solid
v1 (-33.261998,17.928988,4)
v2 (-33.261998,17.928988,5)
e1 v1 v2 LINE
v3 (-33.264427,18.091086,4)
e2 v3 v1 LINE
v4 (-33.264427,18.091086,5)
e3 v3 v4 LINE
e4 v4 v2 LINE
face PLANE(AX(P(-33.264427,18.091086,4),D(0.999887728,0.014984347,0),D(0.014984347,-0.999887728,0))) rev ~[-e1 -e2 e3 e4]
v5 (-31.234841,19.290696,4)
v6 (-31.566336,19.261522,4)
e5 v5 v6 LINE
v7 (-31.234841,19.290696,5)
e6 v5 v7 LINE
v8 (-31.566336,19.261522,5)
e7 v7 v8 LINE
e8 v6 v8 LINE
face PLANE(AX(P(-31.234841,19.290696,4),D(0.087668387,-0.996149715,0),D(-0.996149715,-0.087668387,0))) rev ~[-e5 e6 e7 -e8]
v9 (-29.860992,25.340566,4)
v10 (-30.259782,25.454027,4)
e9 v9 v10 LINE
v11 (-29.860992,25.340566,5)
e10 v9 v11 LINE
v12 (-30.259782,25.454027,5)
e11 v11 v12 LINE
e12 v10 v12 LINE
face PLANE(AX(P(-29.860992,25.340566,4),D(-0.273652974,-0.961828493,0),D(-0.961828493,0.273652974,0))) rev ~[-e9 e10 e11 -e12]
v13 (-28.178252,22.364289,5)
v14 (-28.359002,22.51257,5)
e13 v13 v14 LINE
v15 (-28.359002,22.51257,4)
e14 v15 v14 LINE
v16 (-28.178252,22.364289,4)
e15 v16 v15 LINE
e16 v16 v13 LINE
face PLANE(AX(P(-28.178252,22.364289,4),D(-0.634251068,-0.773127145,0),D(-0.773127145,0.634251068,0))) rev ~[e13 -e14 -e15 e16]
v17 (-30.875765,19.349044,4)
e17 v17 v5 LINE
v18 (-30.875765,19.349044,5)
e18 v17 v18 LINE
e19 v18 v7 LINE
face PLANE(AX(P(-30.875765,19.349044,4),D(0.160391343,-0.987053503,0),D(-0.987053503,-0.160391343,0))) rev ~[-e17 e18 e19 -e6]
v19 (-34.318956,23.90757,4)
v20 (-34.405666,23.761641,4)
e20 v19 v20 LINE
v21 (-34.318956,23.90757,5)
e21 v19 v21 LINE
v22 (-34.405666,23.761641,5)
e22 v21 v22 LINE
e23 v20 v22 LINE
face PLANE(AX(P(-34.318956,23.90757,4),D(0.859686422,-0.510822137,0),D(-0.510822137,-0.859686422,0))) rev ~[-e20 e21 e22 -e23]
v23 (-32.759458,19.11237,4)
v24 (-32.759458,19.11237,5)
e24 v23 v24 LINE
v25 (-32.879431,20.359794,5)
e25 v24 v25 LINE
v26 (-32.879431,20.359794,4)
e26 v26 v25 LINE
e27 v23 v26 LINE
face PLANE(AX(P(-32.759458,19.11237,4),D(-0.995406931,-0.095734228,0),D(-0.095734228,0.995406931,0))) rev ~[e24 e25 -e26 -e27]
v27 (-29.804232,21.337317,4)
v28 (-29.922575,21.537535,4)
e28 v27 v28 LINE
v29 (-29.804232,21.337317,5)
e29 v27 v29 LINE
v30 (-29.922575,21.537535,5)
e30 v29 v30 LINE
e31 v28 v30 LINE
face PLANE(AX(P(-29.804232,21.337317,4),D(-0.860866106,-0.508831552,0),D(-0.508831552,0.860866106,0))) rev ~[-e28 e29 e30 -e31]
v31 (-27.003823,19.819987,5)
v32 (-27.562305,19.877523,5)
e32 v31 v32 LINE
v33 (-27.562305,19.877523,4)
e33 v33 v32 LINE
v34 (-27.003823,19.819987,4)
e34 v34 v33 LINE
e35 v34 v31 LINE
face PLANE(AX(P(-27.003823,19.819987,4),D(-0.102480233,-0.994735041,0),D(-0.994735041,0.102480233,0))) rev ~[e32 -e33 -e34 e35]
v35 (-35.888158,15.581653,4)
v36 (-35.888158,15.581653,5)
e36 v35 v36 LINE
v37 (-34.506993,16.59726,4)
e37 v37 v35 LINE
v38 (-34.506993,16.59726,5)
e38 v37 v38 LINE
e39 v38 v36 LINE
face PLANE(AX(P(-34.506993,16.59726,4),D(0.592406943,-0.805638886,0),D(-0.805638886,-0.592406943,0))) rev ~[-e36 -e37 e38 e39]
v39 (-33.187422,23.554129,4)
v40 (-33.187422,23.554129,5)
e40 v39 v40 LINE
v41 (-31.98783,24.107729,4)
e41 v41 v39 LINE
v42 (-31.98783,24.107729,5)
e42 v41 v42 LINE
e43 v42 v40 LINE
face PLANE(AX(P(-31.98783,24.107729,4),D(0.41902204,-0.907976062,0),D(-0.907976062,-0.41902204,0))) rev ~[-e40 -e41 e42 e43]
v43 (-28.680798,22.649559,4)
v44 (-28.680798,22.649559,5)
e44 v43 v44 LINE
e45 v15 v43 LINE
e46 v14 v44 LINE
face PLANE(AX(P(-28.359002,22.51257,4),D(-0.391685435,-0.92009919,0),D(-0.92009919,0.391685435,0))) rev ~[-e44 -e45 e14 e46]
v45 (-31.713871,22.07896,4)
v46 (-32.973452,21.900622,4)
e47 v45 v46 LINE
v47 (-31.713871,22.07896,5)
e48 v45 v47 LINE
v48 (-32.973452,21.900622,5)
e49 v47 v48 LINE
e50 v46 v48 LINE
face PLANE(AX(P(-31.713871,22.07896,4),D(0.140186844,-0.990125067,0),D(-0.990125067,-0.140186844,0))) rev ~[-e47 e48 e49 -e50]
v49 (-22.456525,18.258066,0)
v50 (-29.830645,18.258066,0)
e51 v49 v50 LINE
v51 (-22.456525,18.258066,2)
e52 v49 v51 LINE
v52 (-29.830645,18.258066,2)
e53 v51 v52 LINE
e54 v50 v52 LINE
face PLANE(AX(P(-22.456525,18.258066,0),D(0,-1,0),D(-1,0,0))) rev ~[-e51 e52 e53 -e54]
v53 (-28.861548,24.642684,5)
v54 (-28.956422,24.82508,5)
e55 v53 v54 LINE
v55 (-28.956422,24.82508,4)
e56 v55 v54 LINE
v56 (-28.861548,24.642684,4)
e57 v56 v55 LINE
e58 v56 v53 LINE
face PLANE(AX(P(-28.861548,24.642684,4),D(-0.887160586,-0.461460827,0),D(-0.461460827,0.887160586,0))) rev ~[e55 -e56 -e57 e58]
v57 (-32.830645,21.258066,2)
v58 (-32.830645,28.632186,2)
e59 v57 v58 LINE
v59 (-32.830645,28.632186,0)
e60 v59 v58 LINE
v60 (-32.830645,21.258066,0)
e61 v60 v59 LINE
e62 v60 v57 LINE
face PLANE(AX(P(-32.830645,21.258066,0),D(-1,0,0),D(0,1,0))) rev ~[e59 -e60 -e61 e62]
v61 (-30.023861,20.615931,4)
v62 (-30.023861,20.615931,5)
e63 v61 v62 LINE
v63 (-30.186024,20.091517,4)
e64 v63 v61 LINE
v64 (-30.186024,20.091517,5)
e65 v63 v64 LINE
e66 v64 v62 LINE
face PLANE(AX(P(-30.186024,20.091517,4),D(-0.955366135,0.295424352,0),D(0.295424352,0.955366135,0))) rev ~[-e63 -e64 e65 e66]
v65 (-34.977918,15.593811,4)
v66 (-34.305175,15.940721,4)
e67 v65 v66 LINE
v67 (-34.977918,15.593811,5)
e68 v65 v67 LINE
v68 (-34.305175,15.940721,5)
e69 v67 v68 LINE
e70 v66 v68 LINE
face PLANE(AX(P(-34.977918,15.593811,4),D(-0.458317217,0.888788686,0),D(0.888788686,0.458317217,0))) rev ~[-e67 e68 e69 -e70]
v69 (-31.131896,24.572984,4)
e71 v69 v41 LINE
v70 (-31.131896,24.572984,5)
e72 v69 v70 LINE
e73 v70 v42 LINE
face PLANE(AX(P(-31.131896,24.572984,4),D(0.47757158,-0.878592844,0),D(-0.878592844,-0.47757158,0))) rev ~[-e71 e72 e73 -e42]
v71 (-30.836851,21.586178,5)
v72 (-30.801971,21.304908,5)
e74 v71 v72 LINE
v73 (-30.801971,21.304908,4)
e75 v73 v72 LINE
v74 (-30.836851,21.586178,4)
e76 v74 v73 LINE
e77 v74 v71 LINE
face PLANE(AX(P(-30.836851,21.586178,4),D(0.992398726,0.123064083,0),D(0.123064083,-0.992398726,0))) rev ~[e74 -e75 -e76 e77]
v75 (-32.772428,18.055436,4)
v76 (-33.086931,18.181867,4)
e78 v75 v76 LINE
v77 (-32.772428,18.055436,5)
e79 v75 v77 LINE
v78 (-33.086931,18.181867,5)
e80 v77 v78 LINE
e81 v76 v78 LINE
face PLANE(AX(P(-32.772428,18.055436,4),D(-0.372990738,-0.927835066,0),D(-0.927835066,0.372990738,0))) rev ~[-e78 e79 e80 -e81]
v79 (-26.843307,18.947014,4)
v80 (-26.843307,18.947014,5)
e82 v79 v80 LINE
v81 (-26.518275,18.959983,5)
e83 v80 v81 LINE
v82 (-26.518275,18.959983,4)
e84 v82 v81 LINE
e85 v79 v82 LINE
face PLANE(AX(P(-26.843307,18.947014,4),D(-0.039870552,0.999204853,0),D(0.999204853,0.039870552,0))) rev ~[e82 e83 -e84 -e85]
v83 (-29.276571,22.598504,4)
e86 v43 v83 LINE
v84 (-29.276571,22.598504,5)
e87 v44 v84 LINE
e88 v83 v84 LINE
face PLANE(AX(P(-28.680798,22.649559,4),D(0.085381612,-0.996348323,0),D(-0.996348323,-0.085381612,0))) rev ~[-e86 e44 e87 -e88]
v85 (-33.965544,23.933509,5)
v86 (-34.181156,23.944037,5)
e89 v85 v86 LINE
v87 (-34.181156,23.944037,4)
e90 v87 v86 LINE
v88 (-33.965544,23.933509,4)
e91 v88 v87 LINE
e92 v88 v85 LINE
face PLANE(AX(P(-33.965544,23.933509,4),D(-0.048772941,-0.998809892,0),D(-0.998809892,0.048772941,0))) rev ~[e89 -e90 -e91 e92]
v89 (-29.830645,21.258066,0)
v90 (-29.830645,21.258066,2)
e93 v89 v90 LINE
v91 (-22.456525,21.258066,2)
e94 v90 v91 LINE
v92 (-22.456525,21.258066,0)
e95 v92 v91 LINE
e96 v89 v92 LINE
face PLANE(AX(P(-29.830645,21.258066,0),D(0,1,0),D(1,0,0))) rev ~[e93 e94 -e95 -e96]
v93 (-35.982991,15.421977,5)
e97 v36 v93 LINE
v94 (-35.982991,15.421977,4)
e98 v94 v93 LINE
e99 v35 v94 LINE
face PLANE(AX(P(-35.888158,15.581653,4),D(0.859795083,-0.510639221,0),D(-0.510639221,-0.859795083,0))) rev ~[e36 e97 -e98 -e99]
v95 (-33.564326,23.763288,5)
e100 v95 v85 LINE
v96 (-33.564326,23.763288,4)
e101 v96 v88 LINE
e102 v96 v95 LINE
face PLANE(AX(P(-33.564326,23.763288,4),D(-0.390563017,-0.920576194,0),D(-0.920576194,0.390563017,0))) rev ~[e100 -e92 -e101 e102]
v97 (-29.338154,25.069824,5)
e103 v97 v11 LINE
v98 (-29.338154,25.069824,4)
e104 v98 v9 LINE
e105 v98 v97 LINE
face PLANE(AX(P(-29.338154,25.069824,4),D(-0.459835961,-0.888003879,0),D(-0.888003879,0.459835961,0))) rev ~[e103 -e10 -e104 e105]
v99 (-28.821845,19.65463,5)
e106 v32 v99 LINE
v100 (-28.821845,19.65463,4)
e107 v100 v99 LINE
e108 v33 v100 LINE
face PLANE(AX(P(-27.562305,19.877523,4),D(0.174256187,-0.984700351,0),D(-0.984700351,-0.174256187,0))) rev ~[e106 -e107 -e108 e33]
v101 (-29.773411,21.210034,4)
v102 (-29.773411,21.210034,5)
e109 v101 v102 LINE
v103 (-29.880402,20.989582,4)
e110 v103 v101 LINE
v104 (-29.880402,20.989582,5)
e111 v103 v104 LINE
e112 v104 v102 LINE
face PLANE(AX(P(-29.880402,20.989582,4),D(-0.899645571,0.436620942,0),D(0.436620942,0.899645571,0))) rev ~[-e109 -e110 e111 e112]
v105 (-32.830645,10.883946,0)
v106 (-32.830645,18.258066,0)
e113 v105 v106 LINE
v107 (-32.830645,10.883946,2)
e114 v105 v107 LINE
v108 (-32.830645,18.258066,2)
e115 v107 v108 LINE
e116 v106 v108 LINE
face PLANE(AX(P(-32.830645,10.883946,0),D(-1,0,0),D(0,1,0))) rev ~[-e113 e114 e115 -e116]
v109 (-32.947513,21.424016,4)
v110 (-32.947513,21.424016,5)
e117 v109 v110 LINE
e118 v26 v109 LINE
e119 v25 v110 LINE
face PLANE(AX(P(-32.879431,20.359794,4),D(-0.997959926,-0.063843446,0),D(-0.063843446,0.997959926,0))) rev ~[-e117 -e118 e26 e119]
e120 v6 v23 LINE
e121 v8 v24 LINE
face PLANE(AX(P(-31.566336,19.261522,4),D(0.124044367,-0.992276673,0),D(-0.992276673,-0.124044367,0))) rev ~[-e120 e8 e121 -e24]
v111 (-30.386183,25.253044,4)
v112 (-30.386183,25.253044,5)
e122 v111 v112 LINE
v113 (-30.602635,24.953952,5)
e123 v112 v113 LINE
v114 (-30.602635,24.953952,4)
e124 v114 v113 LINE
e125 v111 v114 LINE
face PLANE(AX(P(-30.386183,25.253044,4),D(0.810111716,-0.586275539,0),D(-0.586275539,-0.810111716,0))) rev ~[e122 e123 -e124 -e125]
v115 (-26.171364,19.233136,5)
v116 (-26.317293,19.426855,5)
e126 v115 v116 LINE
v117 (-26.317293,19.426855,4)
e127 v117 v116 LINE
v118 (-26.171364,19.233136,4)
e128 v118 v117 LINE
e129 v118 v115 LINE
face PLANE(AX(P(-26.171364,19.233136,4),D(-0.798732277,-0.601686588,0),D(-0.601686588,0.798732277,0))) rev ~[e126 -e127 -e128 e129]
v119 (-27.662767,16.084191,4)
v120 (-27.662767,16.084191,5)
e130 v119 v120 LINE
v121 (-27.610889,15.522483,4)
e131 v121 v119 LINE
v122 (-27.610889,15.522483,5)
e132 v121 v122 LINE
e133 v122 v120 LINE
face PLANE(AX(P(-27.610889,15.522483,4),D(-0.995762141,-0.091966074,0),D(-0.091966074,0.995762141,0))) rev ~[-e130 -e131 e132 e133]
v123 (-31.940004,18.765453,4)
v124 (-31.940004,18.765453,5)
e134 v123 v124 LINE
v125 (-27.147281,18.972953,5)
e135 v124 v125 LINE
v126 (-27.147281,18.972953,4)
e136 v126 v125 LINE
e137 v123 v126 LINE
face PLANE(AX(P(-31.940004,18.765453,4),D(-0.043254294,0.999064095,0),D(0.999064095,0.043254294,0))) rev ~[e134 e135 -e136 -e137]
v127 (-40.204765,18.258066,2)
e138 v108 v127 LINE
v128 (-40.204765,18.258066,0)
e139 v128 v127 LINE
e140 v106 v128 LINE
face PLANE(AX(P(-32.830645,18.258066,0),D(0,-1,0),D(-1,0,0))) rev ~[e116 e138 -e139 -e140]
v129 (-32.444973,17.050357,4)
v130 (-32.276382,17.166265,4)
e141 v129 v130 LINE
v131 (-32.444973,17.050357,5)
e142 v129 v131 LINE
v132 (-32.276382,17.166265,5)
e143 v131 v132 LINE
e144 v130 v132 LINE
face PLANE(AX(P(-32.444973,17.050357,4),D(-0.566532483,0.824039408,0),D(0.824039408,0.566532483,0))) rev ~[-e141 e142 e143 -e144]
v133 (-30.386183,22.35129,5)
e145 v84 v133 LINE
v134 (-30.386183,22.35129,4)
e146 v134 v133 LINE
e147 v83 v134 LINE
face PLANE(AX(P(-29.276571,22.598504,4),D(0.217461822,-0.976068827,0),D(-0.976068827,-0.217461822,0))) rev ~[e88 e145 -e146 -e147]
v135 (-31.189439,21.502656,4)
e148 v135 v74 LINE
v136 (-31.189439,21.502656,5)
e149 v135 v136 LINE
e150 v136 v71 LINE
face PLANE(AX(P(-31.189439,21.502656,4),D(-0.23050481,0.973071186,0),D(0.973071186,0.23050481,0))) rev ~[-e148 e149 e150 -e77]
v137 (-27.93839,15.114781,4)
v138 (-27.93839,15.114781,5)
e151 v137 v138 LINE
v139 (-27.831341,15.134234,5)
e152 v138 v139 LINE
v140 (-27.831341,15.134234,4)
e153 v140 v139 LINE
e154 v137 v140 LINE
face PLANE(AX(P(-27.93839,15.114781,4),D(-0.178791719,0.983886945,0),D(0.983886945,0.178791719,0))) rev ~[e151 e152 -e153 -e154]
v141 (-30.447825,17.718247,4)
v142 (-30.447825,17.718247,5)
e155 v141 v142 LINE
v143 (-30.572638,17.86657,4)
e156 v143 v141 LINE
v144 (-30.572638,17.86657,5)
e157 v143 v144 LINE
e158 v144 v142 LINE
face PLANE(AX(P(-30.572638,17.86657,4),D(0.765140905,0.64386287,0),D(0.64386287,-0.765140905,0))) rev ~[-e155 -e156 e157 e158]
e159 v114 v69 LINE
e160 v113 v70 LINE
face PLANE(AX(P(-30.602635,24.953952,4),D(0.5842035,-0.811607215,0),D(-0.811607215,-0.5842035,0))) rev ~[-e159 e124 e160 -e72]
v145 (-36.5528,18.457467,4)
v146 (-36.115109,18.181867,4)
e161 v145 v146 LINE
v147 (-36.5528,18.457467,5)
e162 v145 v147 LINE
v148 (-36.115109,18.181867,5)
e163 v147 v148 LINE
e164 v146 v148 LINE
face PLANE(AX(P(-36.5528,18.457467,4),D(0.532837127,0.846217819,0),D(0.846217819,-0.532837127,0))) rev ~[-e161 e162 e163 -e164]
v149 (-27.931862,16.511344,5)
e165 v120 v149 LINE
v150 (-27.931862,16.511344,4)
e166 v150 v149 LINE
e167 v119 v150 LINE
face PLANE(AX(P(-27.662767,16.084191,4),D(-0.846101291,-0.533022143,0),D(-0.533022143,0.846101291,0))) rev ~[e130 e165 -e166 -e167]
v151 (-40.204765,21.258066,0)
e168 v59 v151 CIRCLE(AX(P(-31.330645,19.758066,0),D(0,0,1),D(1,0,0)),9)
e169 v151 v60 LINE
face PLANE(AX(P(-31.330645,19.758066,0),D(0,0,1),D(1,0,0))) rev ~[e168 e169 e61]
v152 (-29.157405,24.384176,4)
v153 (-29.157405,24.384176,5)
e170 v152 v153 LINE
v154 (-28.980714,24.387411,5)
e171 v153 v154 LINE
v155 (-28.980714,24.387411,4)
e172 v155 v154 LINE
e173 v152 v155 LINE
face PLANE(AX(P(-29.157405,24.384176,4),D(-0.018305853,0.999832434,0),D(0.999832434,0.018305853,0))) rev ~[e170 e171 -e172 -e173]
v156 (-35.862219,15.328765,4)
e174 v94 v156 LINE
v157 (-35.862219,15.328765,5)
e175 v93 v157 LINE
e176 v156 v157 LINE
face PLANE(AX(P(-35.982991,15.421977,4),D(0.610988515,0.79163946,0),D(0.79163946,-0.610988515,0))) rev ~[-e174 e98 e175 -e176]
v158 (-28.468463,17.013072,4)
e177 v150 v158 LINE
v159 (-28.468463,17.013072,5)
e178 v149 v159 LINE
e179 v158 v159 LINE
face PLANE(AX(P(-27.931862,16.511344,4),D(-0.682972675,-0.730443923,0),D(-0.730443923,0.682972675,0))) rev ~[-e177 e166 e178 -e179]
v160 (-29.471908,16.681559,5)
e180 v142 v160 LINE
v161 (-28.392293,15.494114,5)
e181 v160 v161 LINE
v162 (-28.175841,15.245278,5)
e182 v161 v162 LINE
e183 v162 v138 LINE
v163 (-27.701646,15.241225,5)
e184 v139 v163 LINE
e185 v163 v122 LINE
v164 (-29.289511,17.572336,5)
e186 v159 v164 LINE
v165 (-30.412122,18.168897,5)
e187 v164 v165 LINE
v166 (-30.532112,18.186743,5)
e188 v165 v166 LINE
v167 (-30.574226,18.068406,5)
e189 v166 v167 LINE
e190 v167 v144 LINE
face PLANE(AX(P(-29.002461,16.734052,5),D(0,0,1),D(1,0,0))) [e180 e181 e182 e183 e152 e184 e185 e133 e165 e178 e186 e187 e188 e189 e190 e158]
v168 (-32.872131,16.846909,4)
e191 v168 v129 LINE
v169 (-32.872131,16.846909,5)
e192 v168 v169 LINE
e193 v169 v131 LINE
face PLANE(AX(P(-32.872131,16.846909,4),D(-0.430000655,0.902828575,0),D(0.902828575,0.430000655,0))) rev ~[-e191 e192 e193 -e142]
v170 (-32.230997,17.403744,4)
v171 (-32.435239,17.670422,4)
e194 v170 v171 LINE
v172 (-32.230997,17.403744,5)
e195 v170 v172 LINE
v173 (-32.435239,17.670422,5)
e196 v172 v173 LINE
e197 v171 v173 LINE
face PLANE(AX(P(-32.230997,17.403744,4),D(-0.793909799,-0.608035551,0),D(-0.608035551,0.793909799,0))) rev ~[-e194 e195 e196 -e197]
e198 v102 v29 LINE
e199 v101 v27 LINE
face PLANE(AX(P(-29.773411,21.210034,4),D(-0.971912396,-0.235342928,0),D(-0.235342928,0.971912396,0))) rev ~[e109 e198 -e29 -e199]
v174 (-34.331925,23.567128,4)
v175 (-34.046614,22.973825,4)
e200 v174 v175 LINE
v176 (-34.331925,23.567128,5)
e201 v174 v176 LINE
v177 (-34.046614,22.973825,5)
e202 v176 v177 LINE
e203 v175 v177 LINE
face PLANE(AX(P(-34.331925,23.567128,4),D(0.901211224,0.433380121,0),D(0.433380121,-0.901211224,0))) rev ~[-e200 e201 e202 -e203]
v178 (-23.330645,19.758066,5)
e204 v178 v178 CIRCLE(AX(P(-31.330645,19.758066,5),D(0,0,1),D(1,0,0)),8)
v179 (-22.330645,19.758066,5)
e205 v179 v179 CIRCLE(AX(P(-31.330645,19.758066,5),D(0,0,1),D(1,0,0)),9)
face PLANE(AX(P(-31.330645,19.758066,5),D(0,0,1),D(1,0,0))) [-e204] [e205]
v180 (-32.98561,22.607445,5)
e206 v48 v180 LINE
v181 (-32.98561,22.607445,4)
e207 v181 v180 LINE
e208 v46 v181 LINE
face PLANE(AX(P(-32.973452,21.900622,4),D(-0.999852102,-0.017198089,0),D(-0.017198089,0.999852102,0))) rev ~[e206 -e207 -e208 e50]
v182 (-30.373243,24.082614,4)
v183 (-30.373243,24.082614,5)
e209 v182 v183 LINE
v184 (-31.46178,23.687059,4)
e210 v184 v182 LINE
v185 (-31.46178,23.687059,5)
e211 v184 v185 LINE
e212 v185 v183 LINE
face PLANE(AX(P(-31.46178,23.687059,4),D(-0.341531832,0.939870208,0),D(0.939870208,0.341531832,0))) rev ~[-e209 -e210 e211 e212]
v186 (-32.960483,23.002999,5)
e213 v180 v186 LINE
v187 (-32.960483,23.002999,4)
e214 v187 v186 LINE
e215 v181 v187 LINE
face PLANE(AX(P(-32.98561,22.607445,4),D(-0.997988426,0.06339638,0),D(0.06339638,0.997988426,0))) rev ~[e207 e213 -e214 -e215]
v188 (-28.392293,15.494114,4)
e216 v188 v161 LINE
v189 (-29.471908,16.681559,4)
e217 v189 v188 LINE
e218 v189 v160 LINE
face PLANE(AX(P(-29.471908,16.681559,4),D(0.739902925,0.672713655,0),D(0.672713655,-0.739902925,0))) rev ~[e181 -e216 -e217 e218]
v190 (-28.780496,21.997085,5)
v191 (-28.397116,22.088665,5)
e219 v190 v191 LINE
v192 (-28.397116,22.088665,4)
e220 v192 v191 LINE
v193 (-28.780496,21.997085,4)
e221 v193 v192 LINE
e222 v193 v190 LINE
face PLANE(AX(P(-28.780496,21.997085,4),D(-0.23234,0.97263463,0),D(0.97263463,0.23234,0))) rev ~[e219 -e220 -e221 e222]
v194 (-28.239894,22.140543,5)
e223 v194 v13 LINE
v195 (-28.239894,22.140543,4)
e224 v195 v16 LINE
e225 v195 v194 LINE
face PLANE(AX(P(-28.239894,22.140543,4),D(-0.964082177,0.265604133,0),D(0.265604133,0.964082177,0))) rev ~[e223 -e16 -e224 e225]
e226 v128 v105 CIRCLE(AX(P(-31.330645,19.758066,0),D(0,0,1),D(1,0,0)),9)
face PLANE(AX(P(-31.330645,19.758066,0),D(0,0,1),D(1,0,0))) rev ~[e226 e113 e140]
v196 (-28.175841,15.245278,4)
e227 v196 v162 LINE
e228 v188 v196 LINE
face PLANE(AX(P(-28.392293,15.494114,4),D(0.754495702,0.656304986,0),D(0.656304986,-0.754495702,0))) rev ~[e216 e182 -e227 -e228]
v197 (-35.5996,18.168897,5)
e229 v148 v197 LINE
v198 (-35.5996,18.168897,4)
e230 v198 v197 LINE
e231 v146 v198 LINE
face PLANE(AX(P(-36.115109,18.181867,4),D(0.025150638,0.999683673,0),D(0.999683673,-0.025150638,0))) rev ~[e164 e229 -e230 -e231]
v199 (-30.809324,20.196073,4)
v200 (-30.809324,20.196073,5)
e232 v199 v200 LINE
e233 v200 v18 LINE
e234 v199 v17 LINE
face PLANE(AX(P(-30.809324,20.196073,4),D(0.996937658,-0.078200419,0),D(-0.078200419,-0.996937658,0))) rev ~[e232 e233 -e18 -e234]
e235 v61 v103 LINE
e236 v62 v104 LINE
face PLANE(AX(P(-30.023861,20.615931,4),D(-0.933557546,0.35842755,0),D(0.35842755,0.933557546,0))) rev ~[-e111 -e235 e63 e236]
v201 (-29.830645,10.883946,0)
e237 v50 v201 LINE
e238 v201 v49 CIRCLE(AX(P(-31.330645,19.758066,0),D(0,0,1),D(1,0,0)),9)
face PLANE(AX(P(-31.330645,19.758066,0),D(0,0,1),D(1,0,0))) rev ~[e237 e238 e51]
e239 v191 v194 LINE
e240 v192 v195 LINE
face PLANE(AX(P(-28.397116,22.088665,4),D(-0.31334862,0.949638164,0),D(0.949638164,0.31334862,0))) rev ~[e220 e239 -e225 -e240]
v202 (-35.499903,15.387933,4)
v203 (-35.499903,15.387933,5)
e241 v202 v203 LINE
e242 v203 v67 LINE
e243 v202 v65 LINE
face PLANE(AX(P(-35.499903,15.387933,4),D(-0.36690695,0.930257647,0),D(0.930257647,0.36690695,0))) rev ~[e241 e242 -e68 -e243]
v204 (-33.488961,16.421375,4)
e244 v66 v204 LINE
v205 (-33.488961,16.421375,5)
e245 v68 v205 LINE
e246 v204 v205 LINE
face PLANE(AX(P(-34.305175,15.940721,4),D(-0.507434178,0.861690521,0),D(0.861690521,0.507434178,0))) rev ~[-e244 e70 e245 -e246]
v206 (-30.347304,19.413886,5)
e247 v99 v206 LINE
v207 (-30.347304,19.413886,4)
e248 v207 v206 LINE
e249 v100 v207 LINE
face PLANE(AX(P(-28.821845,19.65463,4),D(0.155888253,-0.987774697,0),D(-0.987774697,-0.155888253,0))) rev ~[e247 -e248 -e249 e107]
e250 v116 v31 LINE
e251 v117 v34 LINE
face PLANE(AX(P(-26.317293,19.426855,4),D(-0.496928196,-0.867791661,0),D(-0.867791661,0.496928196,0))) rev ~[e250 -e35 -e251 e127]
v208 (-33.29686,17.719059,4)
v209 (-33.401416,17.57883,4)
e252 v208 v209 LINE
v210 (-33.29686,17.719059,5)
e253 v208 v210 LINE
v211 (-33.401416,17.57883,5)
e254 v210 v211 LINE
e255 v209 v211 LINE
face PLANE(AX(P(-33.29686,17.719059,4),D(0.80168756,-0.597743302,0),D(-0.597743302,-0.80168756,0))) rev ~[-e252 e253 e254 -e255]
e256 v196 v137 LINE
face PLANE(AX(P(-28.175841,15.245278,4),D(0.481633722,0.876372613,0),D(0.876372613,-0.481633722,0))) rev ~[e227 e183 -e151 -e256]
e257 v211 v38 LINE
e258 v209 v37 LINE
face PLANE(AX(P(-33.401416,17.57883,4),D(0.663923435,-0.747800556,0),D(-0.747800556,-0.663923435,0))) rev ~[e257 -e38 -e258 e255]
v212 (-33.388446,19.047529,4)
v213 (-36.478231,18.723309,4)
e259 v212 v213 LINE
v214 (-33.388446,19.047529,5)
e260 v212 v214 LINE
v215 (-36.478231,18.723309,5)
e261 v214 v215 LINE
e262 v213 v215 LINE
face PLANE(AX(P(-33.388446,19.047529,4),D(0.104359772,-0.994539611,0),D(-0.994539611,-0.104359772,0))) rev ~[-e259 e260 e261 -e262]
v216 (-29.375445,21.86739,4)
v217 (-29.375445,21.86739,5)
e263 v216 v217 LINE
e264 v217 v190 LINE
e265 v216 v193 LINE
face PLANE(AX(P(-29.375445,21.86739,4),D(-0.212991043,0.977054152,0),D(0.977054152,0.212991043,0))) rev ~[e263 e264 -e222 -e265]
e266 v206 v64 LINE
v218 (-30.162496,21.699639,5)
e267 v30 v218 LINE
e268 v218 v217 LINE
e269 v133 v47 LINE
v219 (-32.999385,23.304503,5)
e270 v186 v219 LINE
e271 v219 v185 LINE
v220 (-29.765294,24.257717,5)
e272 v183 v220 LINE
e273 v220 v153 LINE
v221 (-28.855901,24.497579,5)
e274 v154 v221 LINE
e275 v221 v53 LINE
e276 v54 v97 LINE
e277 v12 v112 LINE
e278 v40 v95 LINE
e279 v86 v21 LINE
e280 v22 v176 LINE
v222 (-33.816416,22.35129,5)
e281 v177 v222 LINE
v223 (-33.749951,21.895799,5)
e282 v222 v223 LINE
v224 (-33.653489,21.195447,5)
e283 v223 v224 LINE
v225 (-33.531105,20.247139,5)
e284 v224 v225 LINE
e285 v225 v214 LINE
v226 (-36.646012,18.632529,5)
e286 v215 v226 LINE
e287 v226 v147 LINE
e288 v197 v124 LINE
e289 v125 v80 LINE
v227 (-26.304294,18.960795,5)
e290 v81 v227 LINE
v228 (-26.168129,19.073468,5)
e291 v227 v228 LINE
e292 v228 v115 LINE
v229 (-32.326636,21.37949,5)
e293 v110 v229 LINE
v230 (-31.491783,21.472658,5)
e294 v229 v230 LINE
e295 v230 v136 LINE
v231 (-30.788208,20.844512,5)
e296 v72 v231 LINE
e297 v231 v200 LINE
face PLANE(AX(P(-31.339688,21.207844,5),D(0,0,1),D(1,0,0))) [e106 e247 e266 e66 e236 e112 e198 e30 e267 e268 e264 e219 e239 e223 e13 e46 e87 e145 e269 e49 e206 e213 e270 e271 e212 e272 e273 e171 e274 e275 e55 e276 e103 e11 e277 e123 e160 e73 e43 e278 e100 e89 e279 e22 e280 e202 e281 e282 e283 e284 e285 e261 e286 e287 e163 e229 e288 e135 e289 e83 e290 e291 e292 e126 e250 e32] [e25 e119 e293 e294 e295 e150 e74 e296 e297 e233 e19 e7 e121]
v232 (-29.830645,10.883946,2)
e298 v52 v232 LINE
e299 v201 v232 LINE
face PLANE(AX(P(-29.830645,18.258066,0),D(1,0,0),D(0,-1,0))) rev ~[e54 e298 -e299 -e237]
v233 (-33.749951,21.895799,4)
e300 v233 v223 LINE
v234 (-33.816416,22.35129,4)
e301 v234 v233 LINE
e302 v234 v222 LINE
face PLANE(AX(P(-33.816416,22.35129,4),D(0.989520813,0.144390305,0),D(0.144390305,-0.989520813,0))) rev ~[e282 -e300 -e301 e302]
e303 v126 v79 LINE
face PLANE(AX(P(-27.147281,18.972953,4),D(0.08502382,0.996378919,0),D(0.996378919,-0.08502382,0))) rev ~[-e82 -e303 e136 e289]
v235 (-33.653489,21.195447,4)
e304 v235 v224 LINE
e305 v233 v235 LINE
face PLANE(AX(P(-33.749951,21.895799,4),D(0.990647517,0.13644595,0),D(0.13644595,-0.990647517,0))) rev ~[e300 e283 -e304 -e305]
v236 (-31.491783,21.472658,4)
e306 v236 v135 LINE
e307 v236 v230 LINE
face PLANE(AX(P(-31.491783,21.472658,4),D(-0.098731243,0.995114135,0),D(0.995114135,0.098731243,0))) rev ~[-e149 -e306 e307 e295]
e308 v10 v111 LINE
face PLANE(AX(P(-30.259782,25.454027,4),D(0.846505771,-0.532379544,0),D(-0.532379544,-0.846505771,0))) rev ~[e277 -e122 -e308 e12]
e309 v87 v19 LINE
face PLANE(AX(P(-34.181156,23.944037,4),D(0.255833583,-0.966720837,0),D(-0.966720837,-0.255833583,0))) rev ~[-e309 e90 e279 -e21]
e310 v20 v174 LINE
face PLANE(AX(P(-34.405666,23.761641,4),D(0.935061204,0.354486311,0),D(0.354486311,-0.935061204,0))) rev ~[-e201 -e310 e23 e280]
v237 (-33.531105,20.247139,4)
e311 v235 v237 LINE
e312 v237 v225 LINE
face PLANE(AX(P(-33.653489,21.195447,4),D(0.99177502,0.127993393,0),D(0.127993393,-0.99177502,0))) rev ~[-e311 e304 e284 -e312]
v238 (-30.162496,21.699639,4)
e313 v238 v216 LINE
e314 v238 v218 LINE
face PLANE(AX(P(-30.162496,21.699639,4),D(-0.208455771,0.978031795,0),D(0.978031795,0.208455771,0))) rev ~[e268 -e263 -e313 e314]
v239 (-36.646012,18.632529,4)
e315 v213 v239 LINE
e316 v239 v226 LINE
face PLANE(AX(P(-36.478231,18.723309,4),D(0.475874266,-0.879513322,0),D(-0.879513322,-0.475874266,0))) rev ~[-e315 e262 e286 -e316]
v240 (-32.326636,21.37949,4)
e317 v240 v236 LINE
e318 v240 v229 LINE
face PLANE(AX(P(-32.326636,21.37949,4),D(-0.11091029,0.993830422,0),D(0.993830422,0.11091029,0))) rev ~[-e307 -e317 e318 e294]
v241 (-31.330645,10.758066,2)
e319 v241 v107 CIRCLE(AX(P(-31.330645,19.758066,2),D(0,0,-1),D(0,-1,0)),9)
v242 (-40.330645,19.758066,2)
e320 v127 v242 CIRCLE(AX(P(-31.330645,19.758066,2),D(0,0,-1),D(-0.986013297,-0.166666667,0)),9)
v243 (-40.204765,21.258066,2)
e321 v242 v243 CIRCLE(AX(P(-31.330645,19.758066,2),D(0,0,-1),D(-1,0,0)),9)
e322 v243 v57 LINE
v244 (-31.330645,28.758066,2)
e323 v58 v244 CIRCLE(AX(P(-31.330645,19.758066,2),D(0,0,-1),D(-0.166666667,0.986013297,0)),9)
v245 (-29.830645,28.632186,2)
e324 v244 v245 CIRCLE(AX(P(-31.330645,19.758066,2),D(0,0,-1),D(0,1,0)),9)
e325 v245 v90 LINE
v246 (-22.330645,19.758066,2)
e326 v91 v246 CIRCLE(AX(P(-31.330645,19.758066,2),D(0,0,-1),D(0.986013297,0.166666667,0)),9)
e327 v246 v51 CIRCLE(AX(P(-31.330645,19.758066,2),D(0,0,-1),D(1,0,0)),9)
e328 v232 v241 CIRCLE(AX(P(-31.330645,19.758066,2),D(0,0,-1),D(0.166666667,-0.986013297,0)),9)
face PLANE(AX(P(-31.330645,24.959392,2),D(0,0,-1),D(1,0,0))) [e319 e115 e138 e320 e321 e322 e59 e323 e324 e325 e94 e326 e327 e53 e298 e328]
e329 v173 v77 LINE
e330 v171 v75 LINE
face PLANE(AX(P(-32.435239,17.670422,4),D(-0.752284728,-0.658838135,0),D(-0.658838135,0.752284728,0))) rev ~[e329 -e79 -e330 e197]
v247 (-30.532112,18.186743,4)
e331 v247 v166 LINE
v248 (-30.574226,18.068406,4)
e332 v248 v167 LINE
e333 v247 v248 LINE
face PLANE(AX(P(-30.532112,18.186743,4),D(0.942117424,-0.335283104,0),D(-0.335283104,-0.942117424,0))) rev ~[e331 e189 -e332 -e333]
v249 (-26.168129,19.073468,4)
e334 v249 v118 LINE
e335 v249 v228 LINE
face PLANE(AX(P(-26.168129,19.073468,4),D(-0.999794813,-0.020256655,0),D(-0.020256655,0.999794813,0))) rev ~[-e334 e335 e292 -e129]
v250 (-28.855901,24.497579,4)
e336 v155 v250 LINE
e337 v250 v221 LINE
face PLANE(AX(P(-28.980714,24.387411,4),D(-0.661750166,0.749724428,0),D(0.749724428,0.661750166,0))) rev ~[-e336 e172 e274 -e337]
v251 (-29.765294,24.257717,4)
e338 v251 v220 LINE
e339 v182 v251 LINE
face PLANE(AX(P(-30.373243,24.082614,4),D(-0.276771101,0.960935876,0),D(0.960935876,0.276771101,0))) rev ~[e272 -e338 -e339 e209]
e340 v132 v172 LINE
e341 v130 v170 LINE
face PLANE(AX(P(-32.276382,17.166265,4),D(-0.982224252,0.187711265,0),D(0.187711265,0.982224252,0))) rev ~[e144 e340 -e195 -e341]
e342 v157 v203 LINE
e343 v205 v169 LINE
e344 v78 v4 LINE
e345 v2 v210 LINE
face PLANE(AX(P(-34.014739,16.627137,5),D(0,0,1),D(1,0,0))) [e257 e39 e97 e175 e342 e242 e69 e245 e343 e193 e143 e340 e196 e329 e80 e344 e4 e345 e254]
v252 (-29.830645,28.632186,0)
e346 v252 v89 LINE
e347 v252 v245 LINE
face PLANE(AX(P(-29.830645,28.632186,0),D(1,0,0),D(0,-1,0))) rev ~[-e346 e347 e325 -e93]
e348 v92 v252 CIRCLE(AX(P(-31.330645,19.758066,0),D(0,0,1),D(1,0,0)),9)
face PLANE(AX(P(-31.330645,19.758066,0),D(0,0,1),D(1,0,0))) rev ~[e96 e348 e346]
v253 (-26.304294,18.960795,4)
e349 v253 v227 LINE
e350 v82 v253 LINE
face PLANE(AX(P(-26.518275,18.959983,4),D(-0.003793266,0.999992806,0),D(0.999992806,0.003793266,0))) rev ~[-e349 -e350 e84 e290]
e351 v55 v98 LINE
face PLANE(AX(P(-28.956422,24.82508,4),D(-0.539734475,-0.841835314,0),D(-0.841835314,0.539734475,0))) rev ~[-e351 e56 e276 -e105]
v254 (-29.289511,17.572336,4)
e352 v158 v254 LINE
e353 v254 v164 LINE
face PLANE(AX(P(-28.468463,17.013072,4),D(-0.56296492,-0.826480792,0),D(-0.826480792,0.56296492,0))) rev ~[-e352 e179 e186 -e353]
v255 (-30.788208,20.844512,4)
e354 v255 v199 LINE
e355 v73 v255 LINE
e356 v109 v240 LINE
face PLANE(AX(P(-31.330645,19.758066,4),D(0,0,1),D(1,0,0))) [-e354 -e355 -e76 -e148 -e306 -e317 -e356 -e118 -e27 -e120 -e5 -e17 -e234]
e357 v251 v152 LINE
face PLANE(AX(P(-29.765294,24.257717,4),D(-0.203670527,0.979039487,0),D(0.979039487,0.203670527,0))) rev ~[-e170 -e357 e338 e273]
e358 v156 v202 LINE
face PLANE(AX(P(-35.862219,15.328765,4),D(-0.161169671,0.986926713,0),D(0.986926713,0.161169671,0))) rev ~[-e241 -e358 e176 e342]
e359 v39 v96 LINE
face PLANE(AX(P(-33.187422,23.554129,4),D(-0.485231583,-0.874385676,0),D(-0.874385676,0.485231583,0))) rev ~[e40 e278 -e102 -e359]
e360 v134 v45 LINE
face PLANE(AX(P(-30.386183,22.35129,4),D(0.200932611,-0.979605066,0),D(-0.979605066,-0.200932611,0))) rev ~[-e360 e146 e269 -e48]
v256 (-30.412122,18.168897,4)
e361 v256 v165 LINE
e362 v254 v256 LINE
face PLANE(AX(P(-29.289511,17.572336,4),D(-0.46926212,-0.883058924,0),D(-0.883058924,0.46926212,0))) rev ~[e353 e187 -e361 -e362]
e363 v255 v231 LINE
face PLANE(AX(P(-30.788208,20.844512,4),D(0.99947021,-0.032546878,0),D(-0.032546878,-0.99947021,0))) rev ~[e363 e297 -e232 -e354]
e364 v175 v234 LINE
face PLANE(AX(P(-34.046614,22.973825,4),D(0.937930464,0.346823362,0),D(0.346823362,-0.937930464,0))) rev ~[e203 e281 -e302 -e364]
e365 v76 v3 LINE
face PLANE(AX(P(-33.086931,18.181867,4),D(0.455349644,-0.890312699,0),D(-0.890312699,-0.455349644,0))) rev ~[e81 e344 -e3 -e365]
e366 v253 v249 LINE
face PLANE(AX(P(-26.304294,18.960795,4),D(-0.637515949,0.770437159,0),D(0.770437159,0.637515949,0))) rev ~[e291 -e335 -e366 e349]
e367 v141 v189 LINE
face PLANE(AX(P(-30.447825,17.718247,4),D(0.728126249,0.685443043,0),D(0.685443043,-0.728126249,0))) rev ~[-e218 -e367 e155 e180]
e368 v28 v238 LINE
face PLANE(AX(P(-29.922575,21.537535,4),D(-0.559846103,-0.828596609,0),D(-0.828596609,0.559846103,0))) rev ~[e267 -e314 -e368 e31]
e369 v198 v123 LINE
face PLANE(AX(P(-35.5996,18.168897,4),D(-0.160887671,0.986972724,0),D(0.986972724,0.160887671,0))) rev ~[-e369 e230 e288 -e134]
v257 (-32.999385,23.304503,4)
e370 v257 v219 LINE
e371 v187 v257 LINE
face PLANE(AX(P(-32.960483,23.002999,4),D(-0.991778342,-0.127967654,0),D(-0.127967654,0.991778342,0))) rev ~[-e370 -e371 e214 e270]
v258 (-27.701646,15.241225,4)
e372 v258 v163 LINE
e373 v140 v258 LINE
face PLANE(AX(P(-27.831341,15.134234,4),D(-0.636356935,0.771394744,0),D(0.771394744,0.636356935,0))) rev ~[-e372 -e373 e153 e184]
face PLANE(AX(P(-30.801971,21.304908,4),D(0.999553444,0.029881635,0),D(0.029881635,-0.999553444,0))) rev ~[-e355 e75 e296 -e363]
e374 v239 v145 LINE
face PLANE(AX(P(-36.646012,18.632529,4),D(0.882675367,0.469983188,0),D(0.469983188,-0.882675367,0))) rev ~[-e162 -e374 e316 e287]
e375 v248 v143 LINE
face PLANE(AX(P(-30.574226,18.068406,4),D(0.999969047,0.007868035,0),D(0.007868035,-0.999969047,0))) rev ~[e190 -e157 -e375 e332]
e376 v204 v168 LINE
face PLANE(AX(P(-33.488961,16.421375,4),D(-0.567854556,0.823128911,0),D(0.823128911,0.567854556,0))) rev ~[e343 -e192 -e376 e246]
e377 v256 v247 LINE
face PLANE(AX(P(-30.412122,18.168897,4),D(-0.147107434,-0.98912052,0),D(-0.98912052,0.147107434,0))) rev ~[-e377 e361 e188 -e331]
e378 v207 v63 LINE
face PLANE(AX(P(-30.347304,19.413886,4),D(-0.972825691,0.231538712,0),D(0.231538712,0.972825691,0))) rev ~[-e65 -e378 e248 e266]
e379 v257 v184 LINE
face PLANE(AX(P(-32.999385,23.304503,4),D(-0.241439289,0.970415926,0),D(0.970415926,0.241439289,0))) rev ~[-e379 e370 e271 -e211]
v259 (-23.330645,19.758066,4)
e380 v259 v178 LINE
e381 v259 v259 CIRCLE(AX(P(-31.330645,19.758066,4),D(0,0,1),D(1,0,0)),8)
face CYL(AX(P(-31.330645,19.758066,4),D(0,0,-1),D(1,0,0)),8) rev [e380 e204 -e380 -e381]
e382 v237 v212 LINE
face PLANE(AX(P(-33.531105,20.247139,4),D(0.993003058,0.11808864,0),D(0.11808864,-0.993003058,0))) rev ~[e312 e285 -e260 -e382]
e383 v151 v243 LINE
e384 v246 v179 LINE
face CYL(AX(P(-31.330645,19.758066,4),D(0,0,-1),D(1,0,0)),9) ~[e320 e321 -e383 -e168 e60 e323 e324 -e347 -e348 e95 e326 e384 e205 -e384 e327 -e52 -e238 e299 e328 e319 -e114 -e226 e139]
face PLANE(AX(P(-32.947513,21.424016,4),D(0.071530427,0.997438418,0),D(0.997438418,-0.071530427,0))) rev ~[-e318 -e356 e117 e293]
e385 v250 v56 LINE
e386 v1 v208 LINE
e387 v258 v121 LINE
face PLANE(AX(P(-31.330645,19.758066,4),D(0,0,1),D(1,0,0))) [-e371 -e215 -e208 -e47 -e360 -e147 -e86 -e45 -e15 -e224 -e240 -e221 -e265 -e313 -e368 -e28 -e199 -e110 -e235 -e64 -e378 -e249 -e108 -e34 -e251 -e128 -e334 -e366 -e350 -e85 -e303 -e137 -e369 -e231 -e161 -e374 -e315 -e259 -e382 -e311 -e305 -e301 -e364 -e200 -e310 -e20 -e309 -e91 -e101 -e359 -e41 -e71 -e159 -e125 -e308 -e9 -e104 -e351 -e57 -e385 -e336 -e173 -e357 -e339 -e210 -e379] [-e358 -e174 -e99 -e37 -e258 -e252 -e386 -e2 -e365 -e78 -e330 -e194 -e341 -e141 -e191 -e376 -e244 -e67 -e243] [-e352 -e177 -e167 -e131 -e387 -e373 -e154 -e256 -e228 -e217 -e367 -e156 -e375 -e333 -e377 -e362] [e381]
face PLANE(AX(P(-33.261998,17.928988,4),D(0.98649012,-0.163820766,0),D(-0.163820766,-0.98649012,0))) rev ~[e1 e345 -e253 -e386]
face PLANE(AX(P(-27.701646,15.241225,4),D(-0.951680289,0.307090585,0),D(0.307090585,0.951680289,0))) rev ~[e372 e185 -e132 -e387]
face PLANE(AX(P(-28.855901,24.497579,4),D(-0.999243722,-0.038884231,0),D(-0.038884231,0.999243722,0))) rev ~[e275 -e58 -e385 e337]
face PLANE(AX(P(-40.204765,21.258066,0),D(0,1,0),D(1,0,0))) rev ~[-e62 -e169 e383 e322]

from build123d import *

# Parameters (mm, degrees)
F0_R     = 9
F1_DEPTH = 4
F3_W     = 3
F3_H     = 3
F4_DEPTH = 2
F2_R     = 9
F2_R_2   = 8
F5_DEPTH = 1
F7_DEPTH = 1


# Not quite as in the source:
# - a feature names something its author has since deleted; it is built from what else it names


with BuildPart() as f1:
    # F0 (on Top) → F1 (new body)
    with BuildSketch(Plane.XY):
        with Locations((-31.3306450844, 19.7580661625)):
            Circle(F0_R)
    extrude(amount=F1_DEPTH)

    # F3 (on face) → F4 (cut)
    with BuildSketch(Plane(origin=(0, 0, 0), x_dir=(1, 0, 0), z_dir=(0, 0, -1))):
        with BuildLine():
            ThreePointArc((-32.8306450844, -28.6321858371), (-32.0832814269, -28.7265408676), (-31.3306450844, -28.7580661625))
            ThreePointArc((-31.3306450844, -28.7580661625), (-30.5780087419, -28.7265408676), (-29.8306450844, -28.6321858371))
            Line((-29.8306450844, -28.6321858371), (-29.8306450844, -21.2580661625))
            Line((-29.8306450844, -21.2580661625), (-32.8306450844, -21.2580661625))
            Line((-32.8306450844, -21.2580661625), (-32.8306450844, -28.6321858371))
        make_face()
        with BuildLine():
            ThreePointArc((-40.204764759, -18.2580661625), (-40.2991197895, -19.0054298199), (-40.3306450844, -19.7580661625))
            ThreePointArc((-40.3306450844, -19.7580661625), (-40.2991197895, -20.510702505), (-40.204764759, -21.2580661625))
            Line((-40.204764759, -21.2580661625), (-32.8306450844, -21.2580661625))
            Line((-32.8306450844, -21.2580661625), (-32.8306450844, -18.2580661625))
            Line((-32.8306450844, -18.2580661625), (-40.204764759, -18.2580661625))
        make_face()
        with Locations((-31.3306450844, -19.7580661625)):
            Rectangle(F3_W, F3_H)
        with BuildLine():
            Line((-29.8306450844, -18.2580661625), (-29.8306450844, -21.2580661625))
            Line((-29.8306450844, -21.2580661625), (-22.4565254097, -21.2580661625))
            ThreePointArc((-22.4565254097, -21.2580661625), (-22.3621703793, -20.510702505), (-22.3306450844, -19.7580661625))
            ThreePointArc((-22.3306450844, -19.7580661625), (-22.3621703793, -19.0054298199), (-22.4565254097, -18.2580661625))
            Line((-22.4565254097, -18.2580661625), (-29.8306450844, -18.2580661625))
        make_face()
        with BuildLine():
            Line((-32.8306450844, -10.8839464878), (-32.8306450844, -18.2580661625))
            Line((-32.8306450844, -18.2580661625), (-29.8306450844, -18.2580661625))
            Line((-29.8306450844, -18.2580661625), (-29.8306450844, -10.8839464878))
            ThreePointArc((-29.8306450844, -10.8839464878), (-30.5780087419, -10.7895914574), (-31.3306450844, -10.7580661625))
            ThreePointArc((-31.3306450844, -10.7580661625), (-32.0832814269, -10.7895914574), (-32.8306450844, -10.8839464878))
        make_face()
    extrude(amount=-F4_DEPTH, mode=Mode.SUBTRACT)

    # F2 (on face) → F5 (join)
    with BuildSketch(Plane.XY.offset(4)):
        with Locations((-31.3306450844, 19.7580661625)):
            Circle(F2_R)
        with Locations((-31.3306450844, 19.7580661625)):
            Circle(F2_R_2, mode=Mode.SUBTRACT)
    extrude(amount=F5_DEPTH)

    # F6 (on face) → F7 (join)
    with BuildSketch(Plane.XY.offset(4)):
        Polygon((-33.5311048114, 20.2471387647), (-33.3884463109, 19.0475286451), (-36.4782309787, 18.7233090579), (-36.6460120564, 18.6325285146), (-36.5527999544, 18.4574668773), (-36.1151093936, 18.1818667), (-35.5996001325, 18.1688972107), (-31.940004334, 18.7654525459), (-27.1472810179, 18.9729526111), (-26.8433067742, 18.9470136325), (-26.5182754911, 18.9599831218), (-26.3042936222, 18.9607948177), (-26.1681286891, 19.0734676237), (-26.1713637091, 19.2331364476), (-26.3172925208, 19.4268553276), (-27.0038225852, 19.8199867228), (-27.5623046758, 19.8775230241), (-28.8218450116, 19.6546301455), (-30.3473039921, 19.4138858383), (-30.18602354, 20.0915166568), (-30.0238608098, 20.6159310458), (-29.880402377, 20.9895817386), (-29.7734114426, 21.2100336476), (-29.8042323605, 21.3373169803), (-29.9225752742, 21.5375353096), (-30.1624961218, 21.6996392213), (-29.3754451629, 21.8673897134), (-28.780495574, 21.9970846065), (-28.3971162937, 22.088665082), (-28.2398943213, 22.1405430392), (-28.1782524855, 22.3642887867), (-28.3590018762, 22.5125703402), (-28.6807981392, 22.649558733), (-29.2765711877, 22.5985042354), (-30.3861830508, 22.3512898882), (-31.7138705535, 22.078960022), (-32.9734520623, 21.9006221917), (-32.9856098557, 22.6074446543), (-32.960482573, 23.0029993736), (-32.999385159, 23.3045032384), (-31.4617801489, 23.6870590591), (-30.3732429707, 24.0826137783), (-29.7652944833, 24.2577165886), (-29.1574048143, 24.3841764617), (-28.9807139033, 24.3874114817), (-28.8559009495, 24.4975786176), (-28.8615475299, 24.6426839697), (-28.956421844, 24.8250802796), (-29.338154205, 25.0698242479), (-29.860992257, 25.3405660134), (-30.2597819962, 25.4540269879), (-30.3861830508, 25.2530440175), (-30.6026352986, 24.9539517131), (-31.1318963358, 24.5729839931), (-31.9878296934, 24.1077292973), (-33.1874221675, 23.554129146), (-33.564325526, 23.7632878942), (-33.9655444712, 23.9335087652), (-34.1811556138, 23.9440372849), (-34.3189557025, 23.9075697866), (-34.4056660024, 23.7616409749), (-34.3319251918, 23.5671280446), (-34.0466140726, 22.9738253749), (-33.8164159306, 22.3512898882), (-33.7499509741, 21.8957990709), (-33.6534885593, 21.1954466483), align=None)
        Polygon((-31.2348405543, 19.2906962764), (-31.5663359955, 19.2615222777), (-32.7594584296, 19.1123702098), (-32.8794306171, 20.3597939252), (-32.9475130837, 21.4240155165), (-32.3266362799, 21.3794898775), (-31.491783489, 21.4726584538), (-31.189438519, 21.502655912), (-30.8368507473, 21.5861782468), (-30.8019713497, 21.3049079617), (-30.78820781, 20.8445116777), (-30.8093236679, 20.1960725034), (-30.875765097, 19.3490442736), align=None, mode=Mode.SUBTRACT)
        Polygon((-33.2968599535, 17.7190588557), (-33.4014158002, 17.5788295611), (-34.506992711, 16.59725979), (-35.8881580354, 15.5816534911), (-35.9829911765, 15.4219770208), (-35.8622190568, 15.3287649188), (-35.4999026976, 15.3879328466), (-34.9779175146, 15.5938112845), (-34.3051745173, 15.940721302), (-33.4889613235, 16.4213746931), (-32.8721312356, 16.846909225), (-32.4449733118, 17.0503566924), (-32.2763817145, 17.1662645184), (-32.2309973247, 17.4037443963), (-32.4352388425, 17.6704218003), (-32.7724279189, 18.0554362362), (-33.0869306823, 18.1818667), (-33.2644274074, 18.0910861567), (-33.2619982015, 17.9289881268), align=None)
        Polygon((-30.5726378404, 17.8665698862), (-30.4478248866, 17.7182471597), (-29.4719075777, 16.6815585296), (-28.392293173, 15.4941144379), (-28.1758409251, 15.2452784634), (-27.9383904565, 15.1147812853), (-27.8313407034, 15.1342343429), (-27.7016458104, 15.2412252774), (-27.6108887945, 15.5224832106), (-27.6627667517, 16.0841914985), (-27.9318615979, 16.5113435404), (-28.4684631895, 17.0130716164), (-29.2895112678, 17.5723359936), (-30.4121220294, 18.1688972107), (-30.5321118624, 18.1867427574), (-30.5742259411, 18.0684057255), align=None)
    extrude(amount=F7_DEPTH)


solid = f1.part
